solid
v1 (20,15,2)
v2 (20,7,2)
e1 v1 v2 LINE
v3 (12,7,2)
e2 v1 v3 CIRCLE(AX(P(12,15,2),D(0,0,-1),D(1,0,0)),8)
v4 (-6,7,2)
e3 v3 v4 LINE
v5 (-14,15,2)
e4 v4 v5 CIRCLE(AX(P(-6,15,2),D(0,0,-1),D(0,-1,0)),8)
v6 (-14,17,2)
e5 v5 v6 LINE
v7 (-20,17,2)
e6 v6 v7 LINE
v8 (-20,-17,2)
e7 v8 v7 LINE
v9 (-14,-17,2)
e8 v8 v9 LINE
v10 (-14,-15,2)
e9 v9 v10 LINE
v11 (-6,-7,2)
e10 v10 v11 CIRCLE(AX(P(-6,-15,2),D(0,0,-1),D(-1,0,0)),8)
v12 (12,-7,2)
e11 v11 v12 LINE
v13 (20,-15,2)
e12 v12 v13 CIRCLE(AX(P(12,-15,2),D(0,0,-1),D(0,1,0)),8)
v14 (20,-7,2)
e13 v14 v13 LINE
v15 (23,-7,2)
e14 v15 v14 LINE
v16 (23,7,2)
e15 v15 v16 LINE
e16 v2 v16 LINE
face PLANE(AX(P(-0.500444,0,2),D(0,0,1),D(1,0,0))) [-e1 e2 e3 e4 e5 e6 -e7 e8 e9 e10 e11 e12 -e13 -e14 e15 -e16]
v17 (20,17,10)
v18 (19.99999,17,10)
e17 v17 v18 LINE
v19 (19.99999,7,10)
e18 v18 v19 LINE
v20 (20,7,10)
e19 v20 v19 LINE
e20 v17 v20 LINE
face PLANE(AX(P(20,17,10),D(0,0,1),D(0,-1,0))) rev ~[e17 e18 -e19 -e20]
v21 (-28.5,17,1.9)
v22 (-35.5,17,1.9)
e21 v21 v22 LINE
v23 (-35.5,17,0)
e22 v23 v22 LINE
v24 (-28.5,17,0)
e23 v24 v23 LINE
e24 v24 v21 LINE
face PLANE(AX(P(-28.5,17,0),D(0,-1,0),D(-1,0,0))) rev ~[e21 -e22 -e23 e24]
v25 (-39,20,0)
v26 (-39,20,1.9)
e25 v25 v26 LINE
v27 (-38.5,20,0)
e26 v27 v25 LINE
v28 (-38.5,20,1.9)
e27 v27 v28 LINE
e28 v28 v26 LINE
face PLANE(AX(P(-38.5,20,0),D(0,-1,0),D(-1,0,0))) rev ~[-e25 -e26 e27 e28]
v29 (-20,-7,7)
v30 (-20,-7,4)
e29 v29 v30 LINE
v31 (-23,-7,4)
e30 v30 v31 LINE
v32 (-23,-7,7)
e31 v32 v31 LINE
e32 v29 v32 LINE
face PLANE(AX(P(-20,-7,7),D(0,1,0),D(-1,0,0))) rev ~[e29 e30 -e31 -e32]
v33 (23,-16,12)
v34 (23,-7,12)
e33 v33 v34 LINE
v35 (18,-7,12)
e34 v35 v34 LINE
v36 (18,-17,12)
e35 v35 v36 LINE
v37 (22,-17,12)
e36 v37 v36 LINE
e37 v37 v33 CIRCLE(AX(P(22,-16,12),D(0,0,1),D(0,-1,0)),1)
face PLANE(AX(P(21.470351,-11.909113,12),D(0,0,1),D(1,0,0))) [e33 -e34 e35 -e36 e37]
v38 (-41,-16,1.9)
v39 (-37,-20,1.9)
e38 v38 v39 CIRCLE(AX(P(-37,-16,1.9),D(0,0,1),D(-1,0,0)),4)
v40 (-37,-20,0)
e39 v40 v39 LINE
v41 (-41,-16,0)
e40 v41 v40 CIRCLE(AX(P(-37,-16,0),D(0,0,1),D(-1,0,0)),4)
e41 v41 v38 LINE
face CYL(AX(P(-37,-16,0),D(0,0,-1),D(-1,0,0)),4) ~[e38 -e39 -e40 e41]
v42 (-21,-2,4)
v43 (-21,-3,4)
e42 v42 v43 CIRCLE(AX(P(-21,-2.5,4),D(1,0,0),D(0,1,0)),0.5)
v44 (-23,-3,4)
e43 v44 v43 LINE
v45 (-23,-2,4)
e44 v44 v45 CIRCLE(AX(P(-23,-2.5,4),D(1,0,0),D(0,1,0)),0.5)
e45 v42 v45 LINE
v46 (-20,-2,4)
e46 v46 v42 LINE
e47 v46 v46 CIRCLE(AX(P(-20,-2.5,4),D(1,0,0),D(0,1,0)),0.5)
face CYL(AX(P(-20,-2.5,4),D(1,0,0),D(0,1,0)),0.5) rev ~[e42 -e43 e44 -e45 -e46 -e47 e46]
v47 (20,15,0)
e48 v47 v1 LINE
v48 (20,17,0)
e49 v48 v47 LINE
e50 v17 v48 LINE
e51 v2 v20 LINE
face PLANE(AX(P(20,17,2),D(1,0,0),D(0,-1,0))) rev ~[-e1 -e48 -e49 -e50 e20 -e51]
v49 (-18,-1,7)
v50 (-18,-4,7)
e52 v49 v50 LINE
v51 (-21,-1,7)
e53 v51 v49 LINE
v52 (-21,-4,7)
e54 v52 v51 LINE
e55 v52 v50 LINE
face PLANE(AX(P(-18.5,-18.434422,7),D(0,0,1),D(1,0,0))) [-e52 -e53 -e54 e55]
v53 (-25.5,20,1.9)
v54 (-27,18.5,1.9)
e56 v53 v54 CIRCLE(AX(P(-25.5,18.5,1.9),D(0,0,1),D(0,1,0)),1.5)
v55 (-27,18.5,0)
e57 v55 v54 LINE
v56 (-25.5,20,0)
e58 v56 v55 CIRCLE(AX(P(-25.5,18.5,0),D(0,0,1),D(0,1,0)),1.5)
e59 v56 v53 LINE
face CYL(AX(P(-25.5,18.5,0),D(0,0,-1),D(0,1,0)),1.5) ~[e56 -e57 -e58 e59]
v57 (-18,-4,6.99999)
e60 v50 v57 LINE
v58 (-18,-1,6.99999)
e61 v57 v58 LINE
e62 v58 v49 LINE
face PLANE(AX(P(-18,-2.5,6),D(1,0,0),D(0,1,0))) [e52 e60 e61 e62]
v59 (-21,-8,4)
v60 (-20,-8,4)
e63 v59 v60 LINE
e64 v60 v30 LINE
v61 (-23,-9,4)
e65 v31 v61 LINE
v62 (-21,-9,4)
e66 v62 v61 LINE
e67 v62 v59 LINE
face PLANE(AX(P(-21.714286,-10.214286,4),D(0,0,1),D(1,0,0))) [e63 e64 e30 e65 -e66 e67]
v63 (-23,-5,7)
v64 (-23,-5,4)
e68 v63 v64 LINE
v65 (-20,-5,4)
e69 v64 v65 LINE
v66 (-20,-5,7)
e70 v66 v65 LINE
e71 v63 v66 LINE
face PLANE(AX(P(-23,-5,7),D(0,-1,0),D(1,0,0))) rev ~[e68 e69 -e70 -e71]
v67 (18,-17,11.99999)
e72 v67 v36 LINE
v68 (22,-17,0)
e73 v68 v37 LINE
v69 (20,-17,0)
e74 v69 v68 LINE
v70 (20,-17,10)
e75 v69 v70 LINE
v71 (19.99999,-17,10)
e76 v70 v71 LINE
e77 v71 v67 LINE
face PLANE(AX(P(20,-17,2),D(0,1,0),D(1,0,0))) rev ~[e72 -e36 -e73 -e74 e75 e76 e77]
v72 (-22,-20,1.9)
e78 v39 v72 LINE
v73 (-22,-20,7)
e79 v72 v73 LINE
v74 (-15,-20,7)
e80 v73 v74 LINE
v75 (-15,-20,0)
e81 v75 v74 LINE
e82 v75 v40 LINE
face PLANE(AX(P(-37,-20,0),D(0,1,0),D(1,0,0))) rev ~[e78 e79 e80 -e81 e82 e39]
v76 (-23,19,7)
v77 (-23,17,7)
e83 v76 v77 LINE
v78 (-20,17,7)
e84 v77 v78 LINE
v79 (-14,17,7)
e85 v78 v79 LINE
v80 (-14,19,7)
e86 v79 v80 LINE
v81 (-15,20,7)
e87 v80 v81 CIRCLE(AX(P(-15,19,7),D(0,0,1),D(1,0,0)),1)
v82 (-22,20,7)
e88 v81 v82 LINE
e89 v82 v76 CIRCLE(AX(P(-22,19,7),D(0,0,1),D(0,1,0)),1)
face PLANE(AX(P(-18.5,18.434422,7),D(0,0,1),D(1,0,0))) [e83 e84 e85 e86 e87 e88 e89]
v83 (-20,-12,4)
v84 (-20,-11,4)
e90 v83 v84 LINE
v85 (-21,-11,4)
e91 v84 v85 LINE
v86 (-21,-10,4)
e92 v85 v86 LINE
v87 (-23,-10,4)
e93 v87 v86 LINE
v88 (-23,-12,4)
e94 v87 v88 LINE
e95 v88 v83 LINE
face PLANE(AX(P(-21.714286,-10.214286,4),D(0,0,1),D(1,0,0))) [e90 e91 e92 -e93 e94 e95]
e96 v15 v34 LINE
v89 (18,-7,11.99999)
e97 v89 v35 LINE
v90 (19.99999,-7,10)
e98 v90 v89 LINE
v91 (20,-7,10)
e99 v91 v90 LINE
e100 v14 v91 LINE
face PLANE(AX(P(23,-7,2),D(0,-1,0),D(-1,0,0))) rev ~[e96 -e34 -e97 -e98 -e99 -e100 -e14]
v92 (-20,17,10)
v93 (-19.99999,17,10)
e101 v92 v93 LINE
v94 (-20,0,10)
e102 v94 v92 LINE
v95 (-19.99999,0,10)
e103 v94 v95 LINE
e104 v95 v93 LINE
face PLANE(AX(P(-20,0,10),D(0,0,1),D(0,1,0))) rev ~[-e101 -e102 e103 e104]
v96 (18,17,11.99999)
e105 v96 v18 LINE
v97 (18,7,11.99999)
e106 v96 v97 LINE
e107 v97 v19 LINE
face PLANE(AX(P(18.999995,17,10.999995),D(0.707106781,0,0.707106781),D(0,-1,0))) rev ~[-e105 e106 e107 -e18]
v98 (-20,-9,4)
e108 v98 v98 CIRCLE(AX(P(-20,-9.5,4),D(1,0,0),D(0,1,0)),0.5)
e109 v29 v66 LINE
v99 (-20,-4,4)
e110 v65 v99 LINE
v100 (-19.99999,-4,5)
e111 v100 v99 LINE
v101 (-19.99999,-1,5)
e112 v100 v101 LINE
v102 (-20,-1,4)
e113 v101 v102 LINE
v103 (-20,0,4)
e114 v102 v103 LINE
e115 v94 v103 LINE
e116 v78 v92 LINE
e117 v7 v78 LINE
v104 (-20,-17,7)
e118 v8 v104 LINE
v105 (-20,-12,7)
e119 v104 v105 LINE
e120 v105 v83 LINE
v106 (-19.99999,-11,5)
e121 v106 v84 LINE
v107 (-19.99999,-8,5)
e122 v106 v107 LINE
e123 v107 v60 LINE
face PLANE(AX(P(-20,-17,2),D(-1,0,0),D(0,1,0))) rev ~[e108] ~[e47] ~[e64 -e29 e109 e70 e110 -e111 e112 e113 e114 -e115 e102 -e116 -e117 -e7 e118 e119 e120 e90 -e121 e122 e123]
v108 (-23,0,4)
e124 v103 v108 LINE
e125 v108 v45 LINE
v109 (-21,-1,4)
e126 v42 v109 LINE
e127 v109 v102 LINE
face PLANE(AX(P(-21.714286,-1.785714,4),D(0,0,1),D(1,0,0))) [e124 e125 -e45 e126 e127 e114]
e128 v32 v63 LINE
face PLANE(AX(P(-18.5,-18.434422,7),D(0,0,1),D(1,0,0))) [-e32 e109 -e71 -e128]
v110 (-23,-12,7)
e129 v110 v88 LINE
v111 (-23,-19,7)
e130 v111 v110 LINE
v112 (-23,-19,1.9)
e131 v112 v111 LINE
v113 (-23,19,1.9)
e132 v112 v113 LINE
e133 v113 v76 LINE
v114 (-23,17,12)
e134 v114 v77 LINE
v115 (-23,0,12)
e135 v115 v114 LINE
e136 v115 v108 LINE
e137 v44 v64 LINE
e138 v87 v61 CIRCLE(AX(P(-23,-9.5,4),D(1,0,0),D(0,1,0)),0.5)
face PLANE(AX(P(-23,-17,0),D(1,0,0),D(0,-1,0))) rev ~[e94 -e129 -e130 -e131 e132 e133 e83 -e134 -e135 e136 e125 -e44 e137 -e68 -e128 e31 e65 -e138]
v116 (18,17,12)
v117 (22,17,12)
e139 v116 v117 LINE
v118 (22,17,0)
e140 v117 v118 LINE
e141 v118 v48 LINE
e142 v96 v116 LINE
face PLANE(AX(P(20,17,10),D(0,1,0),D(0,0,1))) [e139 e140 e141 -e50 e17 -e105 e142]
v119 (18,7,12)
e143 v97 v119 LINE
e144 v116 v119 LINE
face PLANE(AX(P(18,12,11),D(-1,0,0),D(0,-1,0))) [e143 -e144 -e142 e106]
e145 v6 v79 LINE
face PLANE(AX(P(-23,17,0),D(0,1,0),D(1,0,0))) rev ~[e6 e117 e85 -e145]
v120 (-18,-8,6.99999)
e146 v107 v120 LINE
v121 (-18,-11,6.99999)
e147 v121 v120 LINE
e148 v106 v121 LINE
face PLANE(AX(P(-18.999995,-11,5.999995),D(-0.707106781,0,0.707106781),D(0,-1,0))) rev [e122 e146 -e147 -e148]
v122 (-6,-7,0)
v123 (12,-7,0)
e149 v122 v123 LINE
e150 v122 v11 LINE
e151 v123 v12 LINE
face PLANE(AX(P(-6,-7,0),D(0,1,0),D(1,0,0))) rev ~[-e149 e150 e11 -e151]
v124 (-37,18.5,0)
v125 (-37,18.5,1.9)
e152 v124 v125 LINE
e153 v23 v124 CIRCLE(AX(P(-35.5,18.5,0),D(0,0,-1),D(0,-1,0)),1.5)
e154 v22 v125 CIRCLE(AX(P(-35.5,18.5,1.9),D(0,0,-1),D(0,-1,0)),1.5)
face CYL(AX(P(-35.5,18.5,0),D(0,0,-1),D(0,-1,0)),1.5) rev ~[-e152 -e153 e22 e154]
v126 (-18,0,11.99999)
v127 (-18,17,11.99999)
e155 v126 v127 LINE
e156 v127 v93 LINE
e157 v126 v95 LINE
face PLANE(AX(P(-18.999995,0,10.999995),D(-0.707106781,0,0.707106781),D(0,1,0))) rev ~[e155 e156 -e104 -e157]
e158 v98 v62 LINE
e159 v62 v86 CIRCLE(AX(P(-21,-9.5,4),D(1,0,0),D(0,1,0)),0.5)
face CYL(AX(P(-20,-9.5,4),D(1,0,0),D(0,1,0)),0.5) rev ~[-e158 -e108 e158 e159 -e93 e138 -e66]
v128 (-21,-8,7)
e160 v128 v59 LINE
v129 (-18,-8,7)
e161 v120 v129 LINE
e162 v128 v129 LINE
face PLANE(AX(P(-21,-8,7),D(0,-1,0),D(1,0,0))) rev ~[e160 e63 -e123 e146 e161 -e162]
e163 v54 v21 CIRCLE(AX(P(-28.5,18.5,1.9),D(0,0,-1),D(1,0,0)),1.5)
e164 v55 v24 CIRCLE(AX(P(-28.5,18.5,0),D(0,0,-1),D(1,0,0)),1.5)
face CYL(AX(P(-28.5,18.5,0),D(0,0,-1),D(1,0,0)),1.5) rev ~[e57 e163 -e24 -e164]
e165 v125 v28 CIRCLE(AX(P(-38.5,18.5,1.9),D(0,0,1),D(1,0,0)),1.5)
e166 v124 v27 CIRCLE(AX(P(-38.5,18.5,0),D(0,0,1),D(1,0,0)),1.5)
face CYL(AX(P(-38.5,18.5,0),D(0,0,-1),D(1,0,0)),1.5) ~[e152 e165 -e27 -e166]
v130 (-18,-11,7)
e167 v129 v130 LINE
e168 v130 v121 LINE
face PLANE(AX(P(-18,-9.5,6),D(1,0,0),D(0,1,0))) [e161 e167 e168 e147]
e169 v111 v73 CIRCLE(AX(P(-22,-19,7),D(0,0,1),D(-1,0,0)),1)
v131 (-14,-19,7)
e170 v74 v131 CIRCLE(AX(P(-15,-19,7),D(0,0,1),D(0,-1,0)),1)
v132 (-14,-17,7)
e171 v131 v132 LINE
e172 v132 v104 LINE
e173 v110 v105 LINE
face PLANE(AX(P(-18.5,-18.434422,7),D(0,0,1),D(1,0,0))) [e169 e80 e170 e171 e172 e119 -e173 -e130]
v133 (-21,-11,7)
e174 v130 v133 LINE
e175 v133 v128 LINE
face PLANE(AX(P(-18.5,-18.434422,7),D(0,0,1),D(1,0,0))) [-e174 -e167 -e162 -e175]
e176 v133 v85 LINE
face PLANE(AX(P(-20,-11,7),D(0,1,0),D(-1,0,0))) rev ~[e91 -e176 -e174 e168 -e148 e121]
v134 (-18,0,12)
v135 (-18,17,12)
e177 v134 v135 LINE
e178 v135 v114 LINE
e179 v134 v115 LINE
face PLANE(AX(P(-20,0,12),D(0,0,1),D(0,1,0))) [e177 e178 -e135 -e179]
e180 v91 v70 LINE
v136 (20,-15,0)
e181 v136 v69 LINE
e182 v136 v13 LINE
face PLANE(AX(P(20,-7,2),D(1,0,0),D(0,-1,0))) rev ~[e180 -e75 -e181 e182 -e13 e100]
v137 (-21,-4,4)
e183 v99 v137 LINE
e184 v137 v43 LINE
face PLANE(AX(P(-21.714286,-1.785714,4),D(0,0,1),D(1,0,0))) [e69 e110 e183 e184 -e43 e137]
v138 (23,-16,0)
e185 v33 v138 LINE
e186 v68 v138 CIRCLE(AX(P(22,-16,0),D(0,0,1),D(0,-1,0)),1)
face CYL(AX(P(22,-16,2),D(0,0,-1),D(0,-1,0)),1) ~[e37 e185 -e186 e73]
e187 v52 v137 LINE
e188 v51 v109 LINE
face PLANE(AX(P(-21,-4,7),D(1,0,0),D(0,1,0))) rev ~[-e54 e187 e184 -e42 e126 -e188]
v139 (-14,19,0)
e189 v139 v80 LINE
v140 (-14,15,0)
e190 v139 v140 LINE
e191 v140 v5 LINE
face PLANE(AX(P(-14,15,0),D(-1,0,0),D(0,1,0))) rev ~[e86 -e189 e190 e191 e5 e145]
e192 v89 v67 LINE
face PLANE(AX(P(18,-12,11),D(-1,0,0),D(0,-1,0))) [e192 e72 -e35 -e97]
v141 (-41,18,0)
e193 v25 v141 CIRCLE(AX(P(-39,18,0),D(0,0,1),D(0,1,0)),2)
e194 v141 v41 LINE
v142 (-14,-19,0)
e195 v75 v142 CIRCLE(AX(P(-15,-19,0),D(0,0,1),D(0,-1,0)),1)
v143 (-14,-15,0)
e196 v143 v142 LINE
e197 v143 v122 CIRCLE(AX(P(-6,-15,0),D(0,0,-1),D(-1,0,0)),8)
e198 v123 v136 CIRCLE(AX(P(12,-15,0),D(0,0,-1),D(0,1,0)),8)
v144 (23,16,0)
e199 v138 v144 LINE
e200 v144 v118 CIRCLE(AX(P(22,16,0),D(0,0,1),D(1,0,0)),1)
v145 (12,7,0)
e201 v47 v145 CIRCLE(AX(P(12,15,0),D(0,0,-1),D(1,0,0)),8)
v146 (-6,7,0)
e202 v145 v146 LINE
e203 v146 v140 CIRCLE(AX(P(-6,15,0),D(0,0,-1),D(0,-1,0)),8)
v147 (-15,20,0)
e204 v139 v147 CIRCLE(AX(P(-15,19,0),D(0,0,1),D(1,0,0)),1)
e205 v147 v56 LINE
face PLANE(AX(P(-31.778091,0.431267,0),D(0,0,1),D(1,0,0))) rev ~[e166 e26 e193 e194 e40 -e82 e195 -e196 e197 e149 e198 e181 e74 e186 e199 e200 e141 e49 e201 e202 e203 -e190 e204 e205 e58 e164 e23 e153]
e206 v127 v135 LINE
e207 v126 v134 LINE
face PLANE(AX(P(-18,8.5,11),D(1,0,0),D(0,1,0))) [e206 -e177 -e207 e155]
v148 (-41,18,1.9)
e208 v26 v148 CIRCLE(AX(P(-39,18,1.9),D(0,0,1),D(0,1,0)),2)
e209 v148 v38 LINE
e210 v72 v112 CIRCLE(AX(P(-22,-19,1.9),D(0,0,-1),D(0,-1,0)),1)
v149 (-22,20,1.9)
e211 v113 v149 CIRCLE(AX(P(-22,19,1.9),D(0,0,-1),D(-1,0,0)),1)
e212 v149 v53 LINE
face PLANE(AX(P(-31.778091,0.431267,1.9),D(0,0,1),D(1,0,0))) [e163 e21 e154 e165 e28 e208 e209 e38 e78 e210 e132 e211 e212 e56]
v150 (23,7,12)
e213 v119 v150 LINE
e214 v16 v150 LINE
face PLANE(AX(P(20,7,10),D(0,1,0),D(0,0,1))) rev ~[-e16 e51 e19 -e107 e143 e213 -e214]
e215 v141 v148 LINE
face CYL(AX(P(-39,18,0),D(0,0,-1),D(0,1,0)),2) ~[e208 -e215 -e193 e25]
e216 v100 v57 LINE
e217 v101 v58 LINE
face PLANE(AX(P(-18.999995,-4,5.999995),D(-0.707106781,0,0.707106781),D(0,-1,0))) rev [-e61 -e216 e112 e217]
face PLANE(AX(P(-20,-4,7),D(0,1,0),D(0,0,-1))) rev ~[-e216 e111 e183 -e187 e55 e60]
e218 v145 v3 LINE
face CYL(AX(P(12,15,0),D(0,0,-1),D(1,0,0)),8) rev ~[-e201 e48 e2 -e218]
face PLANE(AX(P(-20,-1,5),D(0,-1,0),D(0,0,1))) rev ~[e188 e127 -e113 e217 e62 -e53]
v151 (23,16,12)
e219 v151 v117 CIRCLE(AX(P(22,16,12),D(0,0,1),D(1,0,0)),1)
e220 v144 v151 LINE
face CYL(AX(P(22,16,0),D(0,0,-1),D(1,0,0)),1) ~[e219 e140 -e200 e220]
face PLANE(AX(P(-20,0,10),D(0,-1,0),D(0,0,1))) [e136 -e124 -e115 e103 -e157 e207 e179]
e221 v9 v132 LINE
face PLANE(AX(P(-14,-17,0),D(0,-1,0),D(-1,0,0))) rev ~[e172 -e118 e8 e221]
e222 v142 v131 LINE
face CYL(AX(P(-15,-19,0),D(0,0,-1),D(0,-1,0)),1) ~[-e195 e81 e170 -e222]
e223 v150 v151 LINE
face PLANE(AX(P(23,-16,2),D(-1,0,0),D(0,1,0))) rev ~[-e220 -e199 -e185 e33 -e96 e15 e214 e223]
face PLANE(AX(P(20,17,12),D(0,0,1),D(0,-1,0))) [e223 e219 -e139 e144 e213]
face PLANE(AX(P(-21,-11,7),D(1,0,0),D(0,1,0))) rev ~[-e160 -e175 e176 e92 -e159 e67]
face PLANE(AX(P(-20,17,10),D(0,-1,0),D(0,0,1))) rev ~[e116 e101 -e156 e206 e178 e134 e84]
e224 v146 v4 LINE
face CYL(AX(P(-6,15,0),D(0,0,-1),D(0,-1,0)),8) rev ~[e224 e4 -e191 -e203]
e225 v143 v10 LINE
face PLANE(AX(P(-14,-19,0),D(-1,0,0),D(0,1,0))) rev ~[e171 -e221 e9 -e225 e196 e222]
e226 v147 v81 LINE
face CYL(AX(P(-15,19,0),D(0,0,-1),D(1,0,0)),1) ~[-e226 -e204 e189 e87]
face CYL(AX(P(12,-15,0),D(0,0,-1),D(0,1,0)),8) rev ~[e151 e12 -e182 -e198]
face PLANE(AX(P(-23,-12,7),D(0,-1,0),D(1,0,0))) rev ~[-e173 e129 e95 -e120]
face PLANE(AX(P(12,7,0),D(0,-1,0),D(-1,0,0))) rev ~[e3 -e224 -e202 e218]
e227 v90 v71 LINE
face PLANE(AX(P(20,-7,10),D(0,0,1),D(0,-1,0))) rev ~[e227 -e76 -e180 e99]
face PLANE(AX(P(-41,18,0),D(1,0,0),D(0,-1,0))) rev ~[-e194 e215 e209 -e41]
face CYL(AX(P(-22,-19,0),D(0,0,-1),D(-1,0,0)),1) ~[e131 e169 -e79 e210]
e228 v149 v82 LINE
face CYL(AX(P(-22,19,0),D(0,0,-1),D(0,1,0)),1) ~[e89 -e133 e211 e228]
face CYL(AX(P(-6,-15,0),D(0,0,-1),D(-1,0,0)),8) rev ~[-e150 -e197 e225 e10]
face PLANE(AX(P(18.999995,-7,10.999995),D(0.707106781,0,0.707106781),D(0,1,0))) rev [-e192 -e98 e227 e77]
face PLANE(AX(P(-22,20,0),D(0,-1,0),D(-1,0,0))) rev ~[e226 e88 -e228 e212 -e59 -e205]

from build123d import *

# Parameters (mm, degrees)
F1_DEPTH  = 2
F2_W      = 3
F2_H      = 17
F3_DEPTH  = 10
F4_W      = 10
F4_H      = 2
F5_DEPTH  = 2
F6_SIZE   = 1.99999
F2_H_2    = 10
F2_H_3    = 7
F7_DEPTH  = 5
F8_DEPTH  = 7
F9_W      = 17
F9_H      = 2
F10_DEPTH = 2
F11_SIZE  = 1.99999
F14_DEPTH = 2
F15_SIZE  = 1.99999
F17_DEPTH = 3
F18_R     = 0.5
F19_DEPTH = 3.001
F21_DEPTH = 1.9


# Not quite as in the source:
# - a fillet or chamfer is up to 0.001 mm smaller than in the source, because OpenCascade refuses the exact size
# - a feature names something its author has since deleted; it is built from what else it names


with BuildPart() as f1:
    # F0 (on Top) → F1 (new body)
    with BuildSketch(Plane.XY):
        with BuildLine():
            Line((-14, 17), (-15, 17))
            Line((-15, 17), (-20, 17))
            Line((-20, 17), (-20, -15))
            Line((-20, -15), (-20, -17))
            Line((-20, -17), (-15, -17))
            Line((-15, -17), (-14, -17))
            Line((-14, -17), (-14, -15))
            ThreePointArc((-14, -15), (-11.6568542495, -9.3431457505), (-6, -7))
            Line((-6, -7), (12, -7))
            ThreePointArc((12, -7), (17.6568542495, -9.3431457505), (20, -15))
            Line((20, -15), (20, 15))
            ThreePointArc((20, 15), (17.6568542495, 9.3431457505), (12, 7))
            Line((12, 7), (-6, 7))
            ThreePointArc((-6, 7), (-11.6568542495, 9.3431457505), (-14, 15))
            Line((-14, 15), (-14, 17))
        make_face()
        Polygon((-20, -15), (-20, 17), (-23, 17), (-23, -17), (-20, -17), align=None)
        with BuildLine():
            Line((22, 17), (20, 17))
            Line((20, 17), (20, 15))
            Line((20, 15), (20, -15))
            Line((20, -15), (20, -17))
            Line((20, -17), (22, -17))
            ThreePointArc((22, -17), (22.7071067812, -16.7071067812), (23, -16))
            Line((23, -16), (23, 16))
            ThreePointArc((23, 16), (22.7071067812, 16.7071067812), (22, 17))
        make_face()
    extrude(amount=F1_DEPTH)

    # F2 (on face) → F3 (join)
    with BuildSketch(Plane.XY.offset(2)):
        with BuildLine():
            Line((20, -7), (20, -15))
            Line((20, -15), (20, -17))
            Line((20, -17), (22, -17))
            ThreePointArc((22, -17), (22.7071067812, -16.7071067812), (23, -16))
            Line((23, -16), (23, -7))
            Line((23, -7), (20, -7))
        make_face()
        with BuildLine():
            Line((20, 15), (20, 7))
            Line((20, 7), (23, 7))
            Line((23, 7), (23, 16))
            ThreePointArc((23, 16), (22.7071067812, 16.7071067812), (22, 17))
            Line((22, 17), (20, 17))
            Line((20, 17), (20, 15))
        make_face()
        with Locations((-21.5, 8.5)):
            Rectangle(F2_W, F2_H)
    extrude(amount=F3_DEPTH)

    # F4 (on face) → F5 (join)
    with BuildSketch(Plane(origin=(20, 0, 0), x_dir=(0, -1, 0), z_dir=(-1, 0, 0))):
        with Locations((-12, 11)):
            Rectangle(F4_W, F4_H)
        with Locations((12, 11)):
            Rectangle(F4_W, F4_H)
    extrude(amount=F5_DEPTH)

    # F6 (size 2 in the source; OpenCascade refuses exactly that, so slightly less here)
    f6_edges = [f1.edges().sort_by_distance(p)[0] for p in [
        (18, 12, 10),
        (18, -12, 10),
    ]]
    chamfer(f6_edges, length=F6_SIZE)

    # F2 (on face) → F7 (join)
    with BuildSketch(Plane.XY.offset(2)):
        with Locations((-21.5, -12)):
            Rectangle(F2_W, F2_H_2)
        with Locations((-21.5, -3.5)):
            Rectangle(F2_W, F2_H_3)
    extrude(amount=F7_DEPTH)

    # F0 (on Top) → F8 (join)
    with BuildSketch(Plane.XY):
        with BuildLine():
            Line((-15, -17), (-20, -17))
            Line((-20, -17), (-23, -17))
            Line((-23, -17), (-23, -19))
            ThreePointArc((-23, -19), (-22.7071067812, -19.7071067812), (-22, -20))
            Line((-22, -20), (-15, -20))
            ThreePointArc((-15, -20), (-14.2928932188, -19.7071067812), (-14, -19))
            Line((-14, -19), (-14, -18))
            Line((-14, -18), (-14, -17))
            Line((-14, -17), (-15, -17))
        make_face()
        with BuildLine():
            Line((-20, 17), (-15, 17))
            Line((-15, 17), (-14, 17))
            Line((-14, 17), (-14, 18))
            Line((-14, 18), (-14, 19))
            ThreePointArc((-14, 19), (-14.2928932188, 19.7071067812), (-15, 20))
            Line((-15, 20), (-22, 20))
            ThreePointArc((-22, 20), (-22.7071067812, 19.7071067812), (-23, 19))
            Line((-23, 19), (-23, 17))
            Line((-23, 17), (-20, 17))
        make_face()
    extrude(amount=F8_DEPTH)

    # F9 (on face) → F10 (join)
    with BuildSketch(Plane.YZ.offset(-20)):
        with Locations((8.5, 11)):
            Rectangle(F9_W, F9_H)
    extrude(amount=F10_DEPTH)

    # F11 (size 2 in the source; OpenCascade refuses exactly that, so slightly less here)
    f11_edges = [f1.edges().sort_by_distance(p)[0] for p in [
        (-18, 8.5, 10),
    ]]
    chamfer(f11_edges, length=F11_SIZE)

    # F13 (on face) → F14 (join)
    with BuildSketch(Plane.YZ.offset(-20)):
        Polygon((-9.5, 7), (-11, 7), (-11, 5), (-8, 5), (-8, 7), align=None)
        Polygon((-1, 5), (-1, 7), (-2.5, 7), (-4, 7), (-4, 5), align=None)
    extrude(amount=F14_DEPTH)

    # F15 (size 2 in the source; OpenCascade refuses exactly that, so slightly less here)
    f15_edges = [f1.edges().sort_by_distance(p)[0] for p in [
        (-18, -9.5, 5),
        (-18, -2.5, 5),
    ]]
    chamfer(f15_edges, length=F15_SIZE)

    # F16 (on face) → F17 (cut)
    with BuildSketch(Plane.XY.offset(7)):
        Polygon((-23, 0), (-23, -1), (-23, -4), (-21, -4), (-21, -1), (-20, -1), (-20, 0), align=None)
        Polygon((-21, -4), (-23, -4), (-23, -5), (-20, -5), (-20, -4), align=None)
        Polygon((-21, -8), (-23, -8), (-23, -11), (-23, -12), (-21, -12), (-20, -12), (-20, -11), (-21, -11), align=None)
        Polygon((-21, -7), (-23, -7), (-23, -8), (-21, -8), (-20, -8), (-20, -7), align=None)
    extrude(amount=-F17_DEPTH, mode=Mode.SUBTRACT)

    # F18 (on face) → F19 (cut, through all)
    with BuildSketch(Plane.YZ.offset(-20)):
        with Locations((-9.5, 4)):
            Circle(F18_R)
        with Locations((-2.5, 4)):
            Circle(F18_R)
    extrude(amount=-F19_DEPTH, mode=Mode.SUBTRACT)

    # F20 (on Top) → F21 (join)
    with BuildSketch(Plane.XY):
        with BuildLine():
            Line((-23, -19), (-23, -17))
            Line((-23, -17), (-23, 17))
            Line((-23, 17), (-23, 19))
            Line((-23, 19), (-23, 20))
            Line((-23, 20), (-25.5, 20))
            ThreePointArc((-25.5, 20), (-26.5606601718, 19.5606601718), (-27, 18.5))
            ThreePointArc((-27, 18.5), (-27.4393398282, 17.4393398282), (-28.5, 17))
            Line((-28.5, 17), (-35.5, 17))
            ThreePointArc((-35.5, 17), (-36.5606601718, 17.4393398282), (-37, 18.5))
            ThreePointArc((-37, 18.5), (-37.4393398282, 19.5606601718), (-38.5, 20))
            Line((-38.5, 20), (-39, 20))
            ThreePointArc((-39, 20), (-40.4142135624, 19.4142135624), (-41, 18))
            Line((-41, 18), (-41, 16))
            Line((-41, 16), (-41, -16))
            ThreePointArc((-41, -16), (-39.8284271247, -18.8284271247), (-37, -20))
            Line((-37, -20), (-23, -20))
            Line((-23, -20), (-23, -19))
        make_face()
        with BuildLine():
            Line((-23, 20), (-23, 19))
            ThreePointArc((-23, 19), (-22.7071067812, 19.7071067812), (-22, 20))
            Line((-22, 20), (-23, 20))
        make_face()
        with BuildLine():
            ThreePointArc((-22, -20), (-22.7071067812, -19.7071067812), (-23, -19))
            Line((-23, -19), (-23, -20))
            Line((-23, -20), (-22, -20))
        make_face()
    extrude(amount=F21_DEPTH)


solid = f1.part
